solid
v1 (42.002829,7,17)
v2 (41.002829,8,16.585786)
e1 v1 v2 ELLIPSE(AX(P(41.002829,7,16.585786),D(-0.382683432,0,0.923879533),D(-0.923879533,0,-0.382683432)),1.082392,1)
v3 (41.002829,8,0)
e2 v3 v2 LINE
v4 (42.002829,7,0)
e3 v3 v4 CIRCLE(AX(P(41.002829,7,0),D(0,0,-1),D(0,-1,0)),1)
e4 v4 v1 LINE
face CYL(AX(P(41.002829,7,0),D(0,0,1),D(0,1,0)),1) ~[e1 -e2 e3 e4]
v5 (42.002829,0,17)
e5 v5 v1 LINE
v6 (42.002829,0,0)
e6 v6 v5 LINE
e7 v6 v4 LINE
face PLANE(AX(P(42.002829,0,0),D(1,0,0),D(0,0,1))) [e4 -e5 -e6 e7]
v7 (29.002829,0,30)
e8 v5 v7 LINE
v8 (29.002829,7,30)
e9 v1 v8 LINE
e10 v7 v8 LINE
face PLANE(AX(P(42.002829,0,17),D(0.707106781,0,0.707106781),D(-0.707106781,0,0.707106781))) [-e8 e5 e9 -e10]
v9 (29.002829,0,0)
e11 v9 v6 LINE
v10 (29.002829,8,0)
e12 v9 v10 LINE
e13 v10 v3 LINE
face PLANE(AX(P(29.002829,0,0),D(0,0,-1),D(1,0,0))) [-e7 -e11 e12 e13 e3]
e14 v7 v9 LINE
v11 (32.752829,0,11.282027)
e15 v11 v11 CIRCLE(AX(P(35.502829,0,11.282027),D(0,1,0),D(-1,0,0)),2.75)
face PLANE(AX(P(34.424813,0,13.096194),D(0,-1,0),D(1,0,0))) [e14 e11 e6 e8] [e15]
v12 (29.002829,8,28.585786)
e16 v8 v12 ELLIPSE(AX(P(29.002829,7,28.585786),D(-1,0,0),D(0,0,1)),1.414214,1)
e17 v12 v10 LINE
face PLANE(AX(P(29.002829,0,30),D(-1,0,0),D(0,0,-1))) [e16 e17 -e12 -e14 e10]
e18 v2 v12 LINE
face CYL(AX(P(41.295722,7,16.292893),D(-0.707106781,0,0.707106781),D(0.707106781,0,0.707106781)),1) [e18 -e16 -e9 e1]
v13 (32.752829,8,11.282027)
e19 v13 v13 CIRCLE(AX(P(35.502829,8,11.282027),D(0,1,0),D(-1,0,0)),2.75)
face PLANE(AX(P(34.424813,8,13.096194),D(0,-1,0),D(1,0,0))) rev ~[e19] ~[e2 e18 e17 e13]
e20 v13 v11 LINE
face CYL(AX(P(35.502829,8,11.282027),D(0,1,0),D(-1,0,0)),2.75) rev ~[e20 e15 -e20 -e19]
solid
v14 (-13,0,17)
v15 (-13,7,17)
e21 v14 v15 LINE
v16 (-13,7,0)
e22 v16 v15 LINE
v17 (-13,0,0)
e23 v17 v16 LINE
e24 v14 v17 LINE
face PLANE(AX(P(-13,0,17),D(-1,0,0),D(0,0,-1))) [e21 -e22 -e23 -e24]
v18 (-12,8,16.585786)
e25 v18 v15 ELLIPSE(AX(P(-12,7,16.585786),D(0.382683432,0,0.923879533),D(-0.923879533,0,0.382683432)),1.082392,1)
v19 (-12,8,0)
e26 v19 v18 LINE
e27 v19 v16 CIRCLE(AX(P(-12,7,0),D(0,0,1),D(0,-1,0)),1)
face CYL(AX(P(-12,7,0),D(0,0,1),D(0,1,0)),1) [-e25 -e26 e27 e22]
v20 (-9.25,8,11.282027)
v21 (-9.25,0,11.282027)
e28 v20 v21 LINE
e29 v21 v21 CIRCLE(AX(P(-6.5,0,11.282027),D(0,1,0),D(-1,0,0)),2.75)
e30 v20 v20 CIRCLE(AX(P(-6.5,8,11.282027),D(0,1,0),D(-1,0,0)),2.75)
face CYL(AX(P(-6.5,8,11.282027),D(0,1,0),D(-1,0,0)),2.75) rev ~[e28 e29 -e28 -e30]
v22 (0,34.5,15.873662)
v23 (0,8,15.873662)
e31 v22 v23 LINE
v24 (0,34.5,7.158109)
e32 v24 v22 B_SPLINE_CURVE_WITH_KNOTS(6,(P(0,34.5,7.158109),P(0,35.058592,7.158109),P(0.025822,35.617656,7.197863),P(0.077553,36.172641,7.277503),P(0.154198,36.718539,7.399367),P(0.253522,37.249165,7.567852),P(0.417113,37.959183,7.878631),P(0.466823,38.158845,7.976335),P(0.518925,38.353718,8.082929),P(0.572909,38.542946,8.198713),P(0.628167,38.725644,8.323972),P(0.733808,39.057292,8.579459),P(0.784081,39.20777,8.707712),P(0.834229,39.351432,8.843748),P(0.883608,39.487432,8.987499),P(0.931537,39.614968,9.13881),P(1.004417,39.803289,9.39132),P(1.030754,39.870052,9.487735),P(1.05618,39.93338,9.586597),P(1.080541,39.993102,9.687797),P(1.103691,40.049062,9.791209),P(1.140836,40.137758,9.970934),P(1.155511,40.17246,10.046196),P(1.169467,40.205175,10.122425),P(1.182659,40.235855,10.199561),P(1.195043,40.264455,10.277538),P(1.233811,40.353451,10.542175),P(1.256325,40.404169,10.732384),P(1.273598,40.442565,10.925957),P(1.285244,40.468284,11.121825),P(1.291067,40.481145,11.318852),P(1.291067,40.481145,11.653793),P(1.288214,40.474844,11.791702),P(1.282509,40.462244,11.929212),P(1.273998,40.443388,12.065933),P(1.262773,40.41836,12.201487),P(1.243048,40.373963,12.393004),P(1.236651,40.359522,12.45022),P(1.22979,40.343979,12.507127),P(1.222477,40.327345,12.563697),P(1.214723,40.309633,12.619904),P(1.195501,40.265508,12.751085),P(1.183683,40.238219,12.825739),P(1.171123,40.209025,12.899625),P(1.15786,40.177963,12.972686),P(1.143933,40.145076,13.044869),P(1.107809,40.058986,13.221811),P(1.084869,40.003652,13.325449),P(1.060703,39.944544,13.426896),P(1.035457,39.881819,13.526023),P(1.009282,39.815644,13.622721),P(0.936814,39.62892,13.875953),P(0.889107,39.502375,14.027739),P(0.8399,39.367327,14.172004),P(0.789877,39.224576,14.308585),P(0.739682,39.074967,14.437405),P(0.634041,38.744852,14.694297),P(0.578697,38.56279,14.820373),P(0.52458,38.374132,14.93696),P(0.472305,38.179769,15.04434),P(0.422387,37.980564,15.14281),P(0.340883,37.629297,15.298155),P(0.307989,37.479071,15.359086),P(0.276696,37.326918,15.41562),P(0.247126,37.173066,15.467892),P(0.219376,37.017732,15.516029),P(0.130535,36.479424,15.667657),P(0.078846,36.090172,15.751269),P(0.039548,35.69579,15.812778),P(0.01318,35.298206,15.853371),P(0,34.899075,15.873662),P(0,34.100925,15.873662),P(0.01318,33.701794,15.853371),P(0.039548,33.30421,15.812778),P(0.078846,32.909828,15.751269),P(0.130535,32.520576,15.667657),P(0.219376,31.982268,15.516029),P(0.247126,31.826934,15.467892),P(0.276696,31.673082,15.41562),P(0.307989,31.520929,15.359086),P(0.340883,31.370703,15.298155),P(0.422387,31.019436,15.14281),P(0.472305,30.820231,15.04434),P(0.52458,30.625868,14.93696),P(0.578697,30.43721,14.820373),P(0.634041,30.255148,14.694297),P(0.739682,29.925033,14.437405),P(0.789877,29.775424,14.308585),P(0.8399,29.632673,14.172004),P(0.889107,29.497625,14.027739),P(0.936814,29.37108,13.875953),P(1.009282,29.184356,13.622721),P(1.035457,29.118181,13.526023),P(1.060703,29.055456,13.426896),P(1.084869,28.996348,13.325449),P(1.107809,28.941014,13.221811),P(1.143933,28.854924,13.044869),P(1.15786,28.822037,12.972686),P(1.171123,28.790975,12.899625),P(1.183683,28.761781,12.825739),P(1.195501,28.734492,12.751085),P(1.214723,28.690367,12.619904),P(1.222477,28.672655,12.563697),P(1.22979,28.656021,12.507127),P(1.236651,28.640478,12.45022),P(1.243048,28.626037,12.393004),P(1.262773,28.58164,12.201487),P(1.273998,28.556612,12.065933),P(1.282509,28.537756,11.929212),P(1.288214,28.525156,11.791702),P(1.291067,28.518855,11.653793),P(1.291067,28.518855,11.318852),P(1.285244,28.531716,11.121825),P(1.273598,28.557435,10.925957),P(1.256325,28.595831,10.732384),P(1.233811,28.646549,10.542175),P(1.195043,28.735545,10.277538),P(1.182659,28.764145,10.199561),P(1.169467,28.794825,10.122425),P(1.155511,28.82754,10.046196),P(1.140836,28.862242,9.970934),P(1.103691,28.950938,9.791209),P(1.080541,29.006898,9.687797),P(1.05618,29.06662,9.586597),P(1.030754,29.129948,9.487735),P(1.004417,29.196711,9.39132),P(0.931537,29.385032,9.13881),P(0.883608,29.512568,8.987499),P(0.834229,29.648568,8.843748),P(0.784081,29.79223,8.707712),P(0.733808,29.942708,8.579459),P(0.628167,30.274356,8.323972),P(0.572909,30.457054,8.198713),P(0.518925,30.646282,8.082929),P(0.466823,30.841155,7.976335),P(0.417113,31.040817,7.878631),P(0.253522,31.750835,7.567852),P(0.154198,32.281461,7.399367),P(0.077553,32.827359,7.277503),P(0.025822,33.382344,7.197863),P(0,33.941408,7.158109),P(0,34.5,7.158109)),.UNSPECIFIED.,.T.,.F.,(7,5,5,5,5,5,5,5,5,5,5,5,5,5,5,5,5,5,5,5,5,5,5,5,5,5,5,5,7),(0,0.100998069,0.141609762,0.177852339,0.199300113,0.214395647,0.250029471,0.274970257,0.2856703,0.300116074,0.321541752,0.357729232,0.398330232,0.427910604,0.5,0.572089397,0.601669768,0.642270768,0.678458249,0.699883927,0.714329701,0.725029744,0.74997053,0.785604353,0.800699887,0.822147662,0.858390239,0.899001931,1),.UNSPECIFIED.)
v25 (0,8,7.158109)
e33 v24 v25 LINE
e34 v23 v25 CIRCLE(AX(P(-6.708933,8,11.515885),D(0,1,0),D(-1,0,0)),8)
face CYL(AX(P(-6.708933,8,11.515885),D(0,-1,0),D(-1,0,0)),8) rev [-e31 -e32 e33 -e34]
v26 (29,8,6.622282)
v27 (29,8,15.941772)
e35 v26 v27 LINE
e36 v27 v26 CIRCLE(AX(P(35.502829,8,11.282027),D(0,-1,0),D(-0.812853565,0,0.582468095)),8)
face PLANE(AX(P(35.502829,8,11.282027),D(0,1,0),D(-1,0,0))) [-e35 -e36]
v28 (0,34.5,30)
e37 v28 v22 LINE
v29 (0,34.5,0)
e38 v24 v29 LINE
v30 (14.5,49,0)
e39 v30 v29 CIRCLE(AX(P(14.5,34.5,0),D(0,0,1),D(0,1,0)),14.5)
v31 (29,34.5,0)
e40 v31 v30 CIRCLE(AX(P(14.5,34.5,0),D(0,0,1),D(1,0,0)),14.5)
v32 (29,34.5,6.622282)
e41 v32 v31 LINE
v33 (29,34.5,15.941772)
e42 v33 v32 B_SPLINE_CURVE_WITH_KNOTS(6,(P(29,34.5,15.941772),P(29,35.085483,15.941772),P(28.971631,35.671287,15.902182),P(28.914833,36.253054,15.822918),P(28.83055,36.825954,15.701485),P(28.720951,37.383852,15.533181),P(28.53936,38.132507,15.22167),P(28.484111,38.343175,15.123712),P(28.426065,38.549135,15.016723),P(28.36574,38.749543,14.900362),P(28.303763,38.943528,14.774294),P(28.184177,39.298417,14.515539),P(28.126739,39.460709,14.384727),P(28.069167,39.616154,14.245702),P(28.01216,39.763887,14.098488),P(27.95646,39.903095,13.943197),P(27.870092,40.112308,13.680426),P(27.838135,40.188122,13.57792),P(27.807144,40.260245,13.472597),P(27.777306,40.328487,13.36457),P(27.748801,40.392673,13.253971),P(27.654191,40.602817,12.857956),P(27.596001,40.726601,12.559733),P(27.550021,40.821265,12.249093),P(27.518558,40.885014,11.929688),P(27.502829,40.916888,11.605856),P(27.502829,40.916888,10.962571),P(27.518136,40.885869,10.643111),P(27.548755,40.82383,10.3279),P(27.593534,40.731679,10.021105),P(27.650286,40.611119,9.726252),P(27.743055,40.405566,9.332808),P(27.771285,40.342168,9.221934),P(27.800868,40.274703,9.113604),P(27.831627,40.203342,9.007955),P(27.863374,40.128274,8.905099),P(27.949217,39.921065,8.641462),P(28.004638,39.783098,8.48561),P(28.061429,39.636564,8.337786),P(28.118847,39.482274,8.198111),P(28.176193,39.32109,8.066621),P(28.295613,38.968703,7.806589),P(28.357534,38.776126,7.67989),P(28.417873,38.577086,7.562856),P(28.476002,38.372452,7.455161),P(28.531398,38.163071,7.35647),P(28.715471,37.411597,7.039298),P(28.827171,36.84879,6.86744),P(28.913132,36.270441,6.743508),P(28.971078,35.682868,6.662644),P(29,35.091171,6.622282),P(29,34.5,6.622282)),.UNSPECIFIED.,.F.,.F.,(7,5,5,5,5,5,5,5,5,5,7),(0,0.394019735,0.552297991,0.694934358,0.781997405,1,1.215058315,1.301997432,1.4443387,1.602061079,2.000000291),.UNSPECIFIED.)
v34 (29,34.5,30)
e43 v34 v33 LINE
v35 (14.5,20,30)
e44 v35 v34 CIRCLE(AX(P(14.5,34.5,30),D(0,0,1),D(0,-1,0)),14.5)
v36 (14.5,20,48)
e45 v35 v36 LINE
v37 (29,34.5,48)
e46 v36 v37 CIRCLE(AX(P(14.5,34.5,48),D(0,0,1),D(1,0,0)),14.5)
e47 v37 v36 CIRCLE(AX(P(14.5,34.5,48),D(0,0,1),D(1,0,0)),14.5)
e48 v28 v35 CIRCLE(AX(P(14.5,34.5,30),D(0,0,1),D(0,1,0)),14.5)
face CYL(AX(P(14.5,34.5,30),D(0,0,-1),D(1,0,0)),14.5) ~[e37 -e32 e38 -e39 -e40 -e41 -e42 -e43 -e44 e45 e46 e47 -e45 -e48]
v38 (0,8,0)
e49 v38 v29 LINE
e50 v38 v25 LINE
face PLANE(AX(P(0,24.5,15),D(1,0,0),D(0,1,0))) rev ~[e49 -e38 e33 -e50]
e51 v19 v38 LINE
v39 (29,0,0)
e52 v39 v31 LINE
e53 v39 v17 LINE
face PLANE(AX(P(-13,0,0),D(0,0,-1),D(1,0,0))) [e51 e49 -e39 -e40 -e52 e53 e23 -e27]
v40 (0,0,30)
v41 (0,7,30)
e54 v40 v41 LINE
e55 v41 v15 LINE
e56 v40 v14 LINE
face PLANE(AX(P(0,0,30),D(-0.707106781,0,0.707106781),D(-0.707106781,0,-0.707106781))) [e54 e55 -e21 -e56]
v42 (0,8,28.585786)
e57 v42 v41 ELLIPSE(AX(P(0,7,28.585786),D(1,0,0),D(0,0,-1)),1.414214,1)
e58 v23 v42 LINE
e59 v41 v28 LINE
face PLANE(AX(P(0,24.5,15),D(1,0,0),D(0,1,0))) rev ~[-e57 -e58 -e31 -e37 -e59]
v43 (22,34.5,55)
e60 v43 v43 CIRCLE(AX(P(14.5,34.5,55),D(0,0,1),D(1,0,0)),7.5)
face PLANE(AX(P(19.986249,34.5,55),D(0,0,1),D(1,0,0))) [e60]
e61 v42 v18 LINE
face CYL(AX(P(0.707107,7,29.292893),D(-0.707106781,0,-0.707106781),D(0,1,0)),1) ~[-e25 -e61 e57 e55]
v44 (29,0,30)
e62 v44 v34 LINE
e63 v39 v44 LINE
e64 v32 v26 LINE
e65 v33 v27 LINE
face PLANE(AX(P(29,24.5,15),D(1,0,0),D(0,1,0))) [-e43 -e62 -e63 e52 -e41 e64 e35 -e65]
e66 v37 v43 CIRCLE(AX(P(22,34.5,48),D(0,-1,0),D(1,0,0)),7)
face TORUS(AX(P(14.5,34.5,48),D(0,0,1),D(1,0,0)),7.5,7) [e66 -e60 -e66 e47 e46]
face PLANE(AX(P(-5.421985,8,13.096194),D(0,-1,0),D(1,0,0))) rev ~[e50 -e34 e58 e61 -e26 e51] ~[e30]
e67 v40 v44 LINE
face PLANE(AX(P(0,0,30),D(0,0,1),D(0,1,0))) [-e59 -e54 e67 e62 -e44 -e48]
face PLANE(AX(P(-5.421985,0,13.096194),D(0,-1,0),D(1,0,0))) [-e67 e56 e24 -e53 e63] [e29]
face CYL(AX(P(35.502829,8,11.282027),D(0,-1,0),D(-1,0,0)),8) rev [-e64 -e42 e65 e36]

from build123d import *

# Parameters (mm, degrees)
F0_W      = 49
F0_H      = 30
F1_DEPTH  = 29
F3_DEPTH  = 8
F5_DEPTH  = 25
F6_DEPTH  = 30
F8_R      = 2.75
F9_DEPTH  = 25
F10_R     = 8
F11_DEPTH = 40
F12_R     = 1
F12_2_R   = 1


# Not quite as in the source:
# - a fillet or chamfer that OpenCascade refuses, or shapes differently, is made with other operations: its cross-section is extruded or revolved along the edge and cut away or added


with BuildPart() as f1:
    # F0 (on Right) → F1 (new body)
    with BuildSketch(Plane.YZ):
        with Locations((24.5, 15)):
            Rectangle(F0_W, F0_H)
    extrude(amount=F1_DEPTH)

    # F2 (on Front) → F3 (join)
    with BuildSketch(Plane.XZ):
        Polygon((-13, 0), (0, 0), (0, 30), (-13, 17), align=None)
    extrude(amount=-F3_DEPTH)

    # F4 (on face) → F5 (join)
    with BuildSketch(Plane.XY.offset(30)):
        with BuildLine():
            ThreePointArc((29, 34.5), (24.7530483272, 44.7530483272), (14.5, 49))
            Line((14.5, 49), (14.5, 20))
            ThreePointArc((14.5, 20), (24.7530483272, 24.2469516728), (29, 34.5))
        make_face()
        with BuildLine():
            Line((14.5, 20), (14.5, 49))
            ThreePointArc((14.5, 49), (0, 34.5), (14.5, 20))
        make_face()
    extrude(amount=F5_DEPTH)

    # F6 (cut): faces of the model
    f6_faces = [f1.faces().sort_by_distance(p)[0] for p in [
        (25.7611648853, 45.7611648853, 30),
        (3.2388351147, 45.7611648853, 30),
    ]]
    extrude(f6_faces, amount=-F6_DEPTH, mode=Mode.SUBTRACT)

    # F7: fillet of radius 7 on 1 edges, made by hand

    # F7_s1 → F7_t2 (revolve, cut)
    with BuildSketch(Plane.XZ.offset(-34.5)):
        with BuildLine():
            ThreePointArc((29, 48), (26.9497474683, 52.9497474683), (22, 55))
            Line((22, 55), (29, 55))
            Line((29, 55), (29, 48))
        make_face()
    revolve(axis=Axis((14.5, 34.5, 55), (0, 0, 1)), mode=Mode.SUBTRACT)


with BuildPart() as f3:
    # F2 (on Front) → F3, piece 2 (new body)
    with BuildSketch(Plane.XZ):
        Polygon((29.0028285235, 30), (29.0028285235, 0), (42.0028285235, 0), (42.0028285235, 17), align=None)
    extrude(amount=-F3_DEPTH)


with BuildPart() as f9_tool:
    # F8 (on face) → F9 (new body)
    with BuildSketch(Plane(origin=(0, 8, 0), x_dir=(-1, 0, 0), z_dir=(0, 1, 0))):
        with Locations((-35.5028285235, 11.2820267677)):
            Circle(F8_R)
        with Locations((6.5, 11.2820267677)):
            Circle(F8_R)
    extrude(amount=-F9_DEPTH)


with BuildPart() as f1_1:
    add(f1.part)

    # F9: cut by f9_tool
    add(f9_tool.part, mode=Mode.SUBTRACT)

    # F10 (on face) → F11 (cut)
    with BuildSketch(Plane(origin=(0, 8, 0), x_dir=(-1, 0, 0), z_dir=(0, 1, 0))):
        with Locations((-35.5028285235, 11.2820267677)):
            Circle(F10_R)
        with Locations((6.708932967, 11.5158854604)):
            Circle(F10_R)
    extrude(amount=F11_DEPTH, mode=Mode.SUBTRACT)

    # F12
    f12_edges = [f1_1.edges().sort_by_distance(p)[0] for p in [
        (-6.5, 8, 23.5),
        (-13, 8, 8.5),
    ]]
    fillet(f12_edges, radius=F12_R)


with BuildPart() as f3_1:
    add(f3.part)

    # F9: cut by f9_tool
    add(f9_tool.part, mode=Mode.SUBTRACT)

    # F12#2
    f12_2_edges = [f3_1.edges().sort_by_distance(p)[0] for p in [
        (35.502829, 8, 23.5),
        (42.002829, 8, 8.5),
    ]]
    fillet(f12_2_edges, radius=F12_2_R)


solid = Compound([f1_1.part, f3_1.part])
